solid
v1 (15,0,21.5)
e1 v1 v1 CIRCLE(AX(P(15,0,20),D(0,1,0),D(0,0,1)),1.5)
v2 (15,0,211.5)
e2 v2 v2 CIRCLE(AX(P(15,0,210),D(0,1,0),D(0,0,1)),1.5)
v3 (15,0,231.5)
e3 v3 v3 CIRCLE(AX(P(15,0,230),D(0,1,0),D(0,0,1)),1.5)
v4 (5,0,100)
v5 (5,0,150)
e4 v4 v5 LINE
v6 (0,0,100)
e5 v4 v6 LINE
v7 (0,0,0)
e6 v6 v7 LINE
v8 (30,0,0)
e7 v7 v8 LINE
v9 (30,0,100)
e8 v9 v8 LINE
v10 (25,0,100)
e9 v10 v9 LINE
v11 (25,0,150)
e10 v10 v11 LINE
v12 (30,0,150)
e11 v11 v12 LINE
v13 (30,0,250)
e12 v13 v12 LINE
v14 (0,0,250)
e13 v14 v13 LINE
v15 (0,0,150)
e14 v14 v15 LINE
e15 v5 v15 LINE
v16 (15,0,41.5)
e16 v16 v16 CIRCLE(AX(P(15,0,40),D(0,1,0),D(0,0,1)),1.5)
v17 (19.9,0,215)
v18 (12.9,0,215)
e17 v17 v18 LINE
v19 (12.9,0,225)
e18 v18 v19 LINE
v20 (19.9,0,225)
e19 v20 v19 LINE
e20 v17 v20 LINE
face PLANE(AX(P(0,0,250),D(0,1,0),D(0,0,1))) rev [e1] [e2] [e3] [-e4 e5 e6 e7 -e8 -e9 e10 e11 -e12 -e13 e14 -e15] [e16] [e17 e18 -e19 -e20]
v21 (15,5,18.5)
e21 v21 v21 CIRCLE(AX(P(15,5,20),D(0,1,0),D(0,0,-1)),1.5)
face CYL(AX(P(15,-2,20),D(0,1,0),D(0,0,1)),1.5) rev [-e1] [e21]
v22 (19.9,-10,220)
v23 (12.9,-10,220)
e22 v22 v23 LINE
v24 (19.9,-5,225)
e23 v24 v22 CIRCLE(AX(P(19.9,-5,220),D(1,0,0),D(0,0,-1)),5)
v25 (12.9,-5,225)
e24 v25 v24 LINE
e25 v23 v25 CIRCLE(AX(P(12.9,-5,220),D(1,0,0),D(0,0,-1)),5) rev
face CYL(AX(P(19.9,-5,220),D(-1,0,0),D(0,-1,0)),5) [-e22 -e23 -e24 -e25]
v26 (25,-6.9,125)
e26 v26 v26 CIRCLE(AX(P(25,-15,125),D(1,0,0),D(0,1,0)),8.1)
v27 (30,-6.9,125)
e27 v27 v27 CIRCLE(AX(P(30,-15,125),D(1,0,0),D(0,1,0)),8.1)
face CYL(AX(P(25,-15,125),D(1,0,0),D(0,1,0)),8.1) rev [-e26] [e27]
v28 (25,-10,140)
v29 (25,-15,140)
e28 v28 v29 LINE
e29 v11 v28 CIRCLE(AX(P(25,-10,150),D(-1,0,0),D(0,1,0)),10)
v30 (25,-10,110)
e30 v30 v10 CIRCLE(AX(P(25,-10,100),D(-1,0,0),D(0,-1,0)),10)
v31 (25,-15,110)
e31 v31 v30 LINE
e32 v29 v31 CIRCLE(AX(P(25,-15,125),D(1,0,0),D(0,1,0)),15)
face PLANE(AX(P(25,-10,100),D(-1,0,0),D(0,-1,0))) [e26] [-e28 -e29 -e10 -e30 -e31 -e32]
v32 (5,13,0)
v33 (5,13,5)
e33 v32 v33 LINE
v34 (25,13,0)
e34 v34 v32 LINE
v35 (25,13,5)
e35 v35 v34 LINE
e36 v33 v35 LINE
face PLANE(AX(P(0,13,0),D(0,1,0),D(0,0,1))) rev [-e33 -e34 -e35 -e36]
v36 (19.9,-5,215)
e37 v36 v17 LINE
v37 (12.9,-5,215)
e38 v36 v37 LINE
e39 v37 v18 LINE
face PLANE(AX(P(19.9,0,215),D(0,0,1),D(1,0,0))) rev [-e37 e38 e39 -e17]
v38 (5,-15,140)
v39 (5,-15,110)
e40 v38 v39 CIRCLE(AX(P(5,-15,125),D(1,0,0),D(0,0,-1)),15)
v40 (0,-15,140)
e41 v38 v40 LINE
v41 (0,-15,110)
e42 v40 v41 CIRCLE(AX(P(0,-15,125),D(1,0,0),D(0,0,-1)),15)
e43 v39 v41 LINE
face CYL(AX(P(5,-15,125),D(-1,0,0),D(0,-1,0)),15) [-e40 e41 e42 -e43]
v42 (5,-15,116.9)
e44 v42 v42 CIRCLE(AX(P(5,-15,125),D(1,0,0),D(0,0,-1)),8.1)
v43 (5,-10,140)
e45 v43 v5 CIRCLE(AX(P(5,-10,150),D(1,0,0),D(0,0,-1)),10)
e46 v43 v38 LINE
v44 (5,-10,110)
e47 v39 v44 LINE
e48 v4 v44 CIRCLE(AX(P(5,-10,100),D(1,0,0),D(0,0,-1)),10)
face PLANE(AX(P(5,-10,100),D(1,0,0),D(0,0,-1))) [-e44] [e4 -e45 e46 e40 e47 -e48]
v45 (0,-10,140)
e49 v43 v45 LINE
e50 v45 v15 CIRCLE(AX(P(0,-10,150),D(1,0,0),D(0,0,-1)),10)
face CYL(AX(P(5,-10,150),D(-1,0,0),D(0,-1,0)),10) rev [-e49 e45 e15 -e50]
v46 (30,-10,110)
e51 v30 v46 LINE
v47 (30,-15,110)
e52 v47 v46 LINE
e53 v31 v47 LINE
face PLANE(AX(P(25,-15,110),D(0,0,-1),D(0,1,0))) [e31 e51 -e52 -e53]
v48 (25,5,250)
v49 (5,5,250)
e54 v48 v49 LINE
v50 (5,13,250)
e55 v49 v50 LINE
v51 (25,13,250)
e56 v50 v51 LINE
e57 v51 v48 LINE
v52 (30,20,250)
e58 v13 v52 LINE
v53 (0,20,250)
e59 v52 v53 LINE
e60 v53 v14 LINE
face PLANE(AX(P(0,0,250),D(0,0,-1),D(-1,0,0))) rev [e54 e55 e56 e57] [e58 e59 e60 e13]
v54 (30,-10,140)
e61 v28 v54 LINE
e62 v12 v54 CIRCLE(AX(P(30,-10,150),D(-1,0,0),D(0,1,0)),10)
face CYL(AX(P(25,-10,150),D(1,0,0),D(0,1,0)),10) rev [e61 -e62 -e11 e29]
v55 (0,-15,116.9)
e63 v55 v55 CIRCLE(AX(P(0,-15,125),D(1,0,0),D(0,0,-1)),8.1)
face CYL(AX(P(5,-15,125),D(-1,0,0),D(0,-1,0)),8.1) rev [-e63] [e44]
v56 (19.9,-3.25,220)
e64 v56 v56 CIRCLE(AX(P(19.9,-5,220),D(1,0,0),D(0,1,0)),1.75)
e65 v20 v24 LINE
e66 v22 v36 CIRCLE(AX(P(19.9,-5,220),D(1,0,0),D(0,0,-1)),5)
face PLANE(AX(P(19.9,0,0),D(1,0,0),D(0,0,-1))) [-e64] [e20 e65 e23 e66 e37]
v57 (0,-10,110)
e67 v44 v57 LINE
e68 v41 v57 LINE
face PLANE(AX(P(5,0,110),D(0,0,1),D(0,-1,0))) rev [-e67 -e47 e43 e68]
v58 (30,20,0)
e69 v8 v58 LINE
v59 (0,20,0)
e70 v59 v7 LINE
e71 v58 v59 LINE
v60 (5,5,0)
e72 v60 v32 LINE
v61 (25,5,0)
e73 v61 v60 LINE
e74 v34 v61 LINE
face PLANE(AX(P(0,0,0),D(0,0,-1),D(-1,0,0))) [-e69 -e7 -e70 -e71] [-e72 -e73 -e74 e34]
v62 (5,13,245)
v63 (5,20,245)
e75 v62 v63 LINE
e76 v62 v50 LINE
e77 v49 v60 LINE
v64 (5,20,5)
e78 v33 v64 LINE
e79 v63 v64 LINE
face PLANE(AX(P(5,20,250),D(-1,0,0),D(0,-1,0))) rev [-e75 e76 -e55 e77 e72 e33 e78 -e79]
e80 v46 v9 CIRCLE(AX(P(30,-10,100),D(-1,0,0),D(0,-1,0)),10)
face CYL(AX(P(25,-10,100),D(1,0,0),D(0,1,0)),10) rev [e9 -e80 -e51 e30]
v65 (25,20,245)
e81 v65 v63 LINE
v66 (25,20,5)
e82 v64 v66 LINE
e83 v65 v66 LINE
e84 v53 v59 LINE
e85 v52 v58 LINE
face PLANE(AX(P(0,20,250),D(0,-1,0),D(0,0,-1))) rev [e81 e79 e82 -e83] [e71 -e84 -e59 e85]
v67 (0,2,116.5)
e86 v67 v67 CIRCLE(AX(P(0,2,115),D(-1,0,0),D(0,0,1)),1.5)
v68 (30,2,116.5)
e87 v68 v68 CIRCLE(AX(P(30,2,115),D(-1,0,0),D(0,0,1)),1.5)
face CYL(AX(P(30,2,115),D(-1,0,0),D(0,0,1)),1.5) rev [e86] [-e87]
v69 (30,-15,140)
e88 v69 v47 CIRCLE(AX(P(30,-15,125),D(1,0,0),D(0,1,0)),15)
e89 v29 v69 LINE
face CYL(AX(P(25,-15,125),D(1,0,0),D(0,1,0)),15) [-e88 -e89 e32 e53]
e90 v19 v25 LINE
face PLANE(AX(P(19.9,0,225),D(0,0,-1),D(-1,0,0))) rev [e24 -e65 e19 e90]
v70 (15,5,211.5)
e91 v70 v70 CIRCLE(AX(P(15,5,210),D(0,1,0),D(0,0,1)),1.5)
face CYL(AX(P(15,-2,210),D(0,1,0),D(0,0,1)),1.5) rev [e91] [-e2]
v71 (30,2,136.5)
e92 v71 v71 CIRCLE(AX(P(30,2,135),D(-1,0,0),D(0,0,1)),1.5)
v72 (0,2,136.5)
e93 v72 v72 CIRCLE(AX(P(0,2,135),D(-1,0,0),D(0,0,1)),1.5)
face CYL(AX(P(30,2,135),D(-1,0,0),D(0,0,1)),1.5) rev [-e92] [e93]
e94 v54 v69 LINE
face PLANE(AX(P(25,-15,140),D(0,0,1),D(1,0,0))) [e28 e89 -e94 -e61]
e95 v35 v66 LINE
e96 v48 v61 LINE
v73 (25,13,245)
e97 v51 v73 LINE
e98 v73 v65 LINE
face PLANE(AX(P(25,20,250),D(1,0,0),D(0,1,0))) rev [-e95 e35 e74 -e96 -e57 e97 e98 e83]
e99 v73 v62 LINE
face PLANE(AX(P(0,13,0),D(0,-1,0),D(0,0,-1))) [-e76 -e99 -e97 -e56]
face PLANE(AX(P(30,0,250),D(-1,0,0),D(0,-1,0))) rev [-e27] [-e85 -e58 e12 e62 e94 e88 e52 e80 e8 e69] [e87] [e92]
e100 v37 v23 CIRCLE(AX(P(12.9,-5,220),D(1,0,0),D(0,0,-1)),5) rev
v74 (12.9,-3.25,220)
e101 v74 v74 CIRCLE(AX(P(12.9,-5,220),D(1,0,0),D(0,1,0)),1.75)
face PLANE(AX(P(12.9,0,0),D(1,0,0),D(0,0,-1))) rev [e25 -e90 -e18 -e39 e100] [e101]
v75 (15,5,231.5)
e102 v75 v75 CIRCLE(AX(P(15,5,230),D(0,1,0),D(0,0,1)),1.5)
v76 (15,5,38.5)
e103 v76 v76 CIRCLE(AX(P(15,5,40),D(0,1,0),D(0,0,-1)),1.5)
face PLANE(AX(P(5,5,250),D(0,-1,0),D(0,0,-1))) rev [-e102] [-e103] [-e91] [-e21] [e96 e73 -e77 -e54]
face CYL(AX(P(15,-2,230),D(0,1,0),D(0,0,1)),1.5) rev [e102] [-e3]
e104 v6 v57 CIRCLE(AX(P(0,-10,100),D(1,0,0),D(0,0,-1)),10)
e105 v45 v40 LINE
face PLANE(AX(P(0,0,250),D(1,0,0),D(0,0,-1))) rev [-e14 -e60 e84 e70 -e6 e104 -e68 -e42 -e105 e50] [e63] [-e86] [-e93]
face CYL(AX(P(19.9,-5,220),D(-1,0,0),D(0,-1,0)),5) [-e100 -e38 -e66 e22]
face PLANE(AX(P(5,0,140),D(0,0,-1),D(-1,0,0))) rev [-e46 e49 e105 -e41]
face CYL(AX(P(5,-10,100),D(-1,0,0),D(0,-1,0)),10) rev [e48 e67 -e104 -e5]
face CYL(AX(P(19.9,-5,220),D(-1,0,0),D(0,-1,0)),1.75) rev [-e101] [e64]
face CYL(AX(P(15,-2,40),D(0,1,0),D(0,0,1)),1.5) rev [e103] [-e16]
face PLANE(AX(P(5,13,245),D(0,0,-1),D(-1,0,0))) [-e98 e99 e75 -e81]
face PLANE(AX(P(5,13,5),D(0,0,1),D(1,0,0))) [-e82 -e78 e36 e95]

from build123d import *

# Parameters (mm, degrees)
BOSS_EXTRUDE1_DEPTH = 250
BOSS_EXTRUDE3_START = -17.1
SKETCH3_W           = 10
SKETCH3_H           = 10
SKETCH3_R           = 1.75
BOSS_EXTRUDE3_DEPTH = 7
FILLET1_R           = 5
SKETCH5_R           = 1.5
CUT_EXTRUDE1_DEPTH  = 7
SKETCH6_W           = 20
SKETCH6_H           = 5
BOSS_EXTRUDE4_DEPTH = 7
SKETCH2_R           = 8.1
BOSS_EXTRUDE5_DEPTH = 5
BOSS_EXTRUDE6_START = -25
SKETCH2_3_R         = 8.1
BOSS_EXTRUDE6_DEPTH = 5
SKETCH7_R           = 1.5
CUT_EXTRUDE2_DEPTH  = 254.574446662


with BuildPart() as part:
    # Sketch1 → Boss-Extrude1 (new body)
    with BuildSketch(Plane.XY):
        Polygon((25, 20), (30, 20), (30, 0), (0, 0), (0, 20), (5, 20), (5, 5), (25, 5), align=None)
    extrude(amount=BOSS_EXTRUDE1_DEPTH)

    # Sketch3 → Boss-Extrude3 (add)
    with BuildSketch(Plane(origin=(30, 0, 0), x_dir=(0, 0, -1), z_dir=(1, 0, 0)).offset(BOSS_EXTRUDE3_START)):
        with Locations((-220, -5)):
            Rectangle(SKETCH3_W, SKETCH3_H)
        with Locations(Location((-220, -5, 0), (0, 0, 90))):
            Circle(SKETCH3_R, mode=Mode.SUBTRACT)
    extrude(amount=BOSS_EXTRUDE3_DEPTH)

    # Fillet1
    fillet1_edges = [part.edges().sort_by_distance(p)[0] for p in [
        (16.4, -10, 215),
        (16.4, -10, 225),
    ]]
    fillet(fillet1_edges, radius=FILLET1_R - 0.0001)  # a hair under: the kernel refuses the full size

    # Sketch5 → Cut-Extrude1 (cut)
    with BuildSketch(Plane(origin=(0, 5, 0), x_dir=(1, 0, 0), z_dir=(0, 1, 0))):
        with Locations(Location((15, -230, 0), (0, 0, 270))):
            Circle(SKETCH5_R)
        with Locations(Location((15, -210, 0), (0, 0, 270))):
            Circle(SKETCH5_R)
        with Locations(Location((15, -40, 0), (0, 0, 270))):
            Circle(SKETCH5_R)
        with Locations(Location((15, -20, 0), (0, 0, 270))):
            Circle(SKETCH5_R)
    extrude(amount=-CUT_EXTRUDE1_DEPTH, mode=Mode.SUBTRACT)

    # Sketch6 → Boss-Extrude4 (add)
    with BuildSketch(Plane(origin=(0, 20, 0), x_dir=(1, 0, 0), z_dir=(0, 1, 0))):
        with Locations((15, -2.5)):
            Rectangle(SKETCH6_W, SKETCH6_H)
        with Locations((15, -247.5)):
            Rectangle(SKETCH6_W, SKETCH6_H)
    extrude(amount=-BOSS_EXTRUDE4_DEPTH)

    # Sketch2 → Boss-Extrude5 (add)
    with BuildSketch(Plane(origin=(30, 0, 0), x_dir=(0, 0, -1), z_dir=(1, 0, 0))):
        with BuildLine():
            Line((-140, -15), (-140, -10))
            ThreePointArc((-140, -10), (-142.928932188, -2.928932188), (-150, 0))
            Line((-150, 0), (-100, 0))
            ThreePointArc((-100, 0), (-107.071067812, -2.928932188), (-110, -10))
            Line((-110, -10), (-110, -15))
            ThreePointArc((-110, -15), (-125, -30), (-140, -15))
        make_face()
        with Locations(Location((-125, -15, 0), (0, 0, 90))):
            Circle(SKETCH2_R, mode=Mode.SUBTRACT)
    extrude(amount=-BOSS_EXTRUDE5_DEPTH)

    # Sketch2<3> → Boss-Extrude6 (add)
    with BuildSketch(Plane(origin=(30, 0, 0), x_dir=(0, 0, -1), z_dir=(1, 0, 0)).offset(BOSS_EXTRUDE6_START)):
        with BuildLine():
            Line((-140, -15), (-140, -10))
            ThreePointArc((-140, -10), (-142.928932188, -2.928932188), (-150, 0))
            Line((-150, 0), (-100, 0))
            ThreePointArc((-100, 0), (-107.071067812, -2.928932188), (-110, -10))
            Line((-110, -10), (-110, -15))
            ThreePointArc((-110, -15), (-125, -30), (-140, -15))
        make_face()
        with Locations(Location((-125, -15, 0), (0, 0, 90))):
            Circle(SKETCH2_3_R, mode=Mode.SUBTRACT)
    extrude(amount=-BOSS_EXTRUDE6_DEPTH)

    # Sketch7 → Cut-Extrude2 (cut, through all)
    with BuildSketch(Plane.ZY):
        with Locations((115, 2)):
            Circle(SKETCH7_R)
        with Locations((135, 2)):
            Circle(SKETCH7_R)
    extrude(amount=-CUT_EXTRUDE2_DEPTH, mode=Mode.SUBTRACT)


solid = part.part
